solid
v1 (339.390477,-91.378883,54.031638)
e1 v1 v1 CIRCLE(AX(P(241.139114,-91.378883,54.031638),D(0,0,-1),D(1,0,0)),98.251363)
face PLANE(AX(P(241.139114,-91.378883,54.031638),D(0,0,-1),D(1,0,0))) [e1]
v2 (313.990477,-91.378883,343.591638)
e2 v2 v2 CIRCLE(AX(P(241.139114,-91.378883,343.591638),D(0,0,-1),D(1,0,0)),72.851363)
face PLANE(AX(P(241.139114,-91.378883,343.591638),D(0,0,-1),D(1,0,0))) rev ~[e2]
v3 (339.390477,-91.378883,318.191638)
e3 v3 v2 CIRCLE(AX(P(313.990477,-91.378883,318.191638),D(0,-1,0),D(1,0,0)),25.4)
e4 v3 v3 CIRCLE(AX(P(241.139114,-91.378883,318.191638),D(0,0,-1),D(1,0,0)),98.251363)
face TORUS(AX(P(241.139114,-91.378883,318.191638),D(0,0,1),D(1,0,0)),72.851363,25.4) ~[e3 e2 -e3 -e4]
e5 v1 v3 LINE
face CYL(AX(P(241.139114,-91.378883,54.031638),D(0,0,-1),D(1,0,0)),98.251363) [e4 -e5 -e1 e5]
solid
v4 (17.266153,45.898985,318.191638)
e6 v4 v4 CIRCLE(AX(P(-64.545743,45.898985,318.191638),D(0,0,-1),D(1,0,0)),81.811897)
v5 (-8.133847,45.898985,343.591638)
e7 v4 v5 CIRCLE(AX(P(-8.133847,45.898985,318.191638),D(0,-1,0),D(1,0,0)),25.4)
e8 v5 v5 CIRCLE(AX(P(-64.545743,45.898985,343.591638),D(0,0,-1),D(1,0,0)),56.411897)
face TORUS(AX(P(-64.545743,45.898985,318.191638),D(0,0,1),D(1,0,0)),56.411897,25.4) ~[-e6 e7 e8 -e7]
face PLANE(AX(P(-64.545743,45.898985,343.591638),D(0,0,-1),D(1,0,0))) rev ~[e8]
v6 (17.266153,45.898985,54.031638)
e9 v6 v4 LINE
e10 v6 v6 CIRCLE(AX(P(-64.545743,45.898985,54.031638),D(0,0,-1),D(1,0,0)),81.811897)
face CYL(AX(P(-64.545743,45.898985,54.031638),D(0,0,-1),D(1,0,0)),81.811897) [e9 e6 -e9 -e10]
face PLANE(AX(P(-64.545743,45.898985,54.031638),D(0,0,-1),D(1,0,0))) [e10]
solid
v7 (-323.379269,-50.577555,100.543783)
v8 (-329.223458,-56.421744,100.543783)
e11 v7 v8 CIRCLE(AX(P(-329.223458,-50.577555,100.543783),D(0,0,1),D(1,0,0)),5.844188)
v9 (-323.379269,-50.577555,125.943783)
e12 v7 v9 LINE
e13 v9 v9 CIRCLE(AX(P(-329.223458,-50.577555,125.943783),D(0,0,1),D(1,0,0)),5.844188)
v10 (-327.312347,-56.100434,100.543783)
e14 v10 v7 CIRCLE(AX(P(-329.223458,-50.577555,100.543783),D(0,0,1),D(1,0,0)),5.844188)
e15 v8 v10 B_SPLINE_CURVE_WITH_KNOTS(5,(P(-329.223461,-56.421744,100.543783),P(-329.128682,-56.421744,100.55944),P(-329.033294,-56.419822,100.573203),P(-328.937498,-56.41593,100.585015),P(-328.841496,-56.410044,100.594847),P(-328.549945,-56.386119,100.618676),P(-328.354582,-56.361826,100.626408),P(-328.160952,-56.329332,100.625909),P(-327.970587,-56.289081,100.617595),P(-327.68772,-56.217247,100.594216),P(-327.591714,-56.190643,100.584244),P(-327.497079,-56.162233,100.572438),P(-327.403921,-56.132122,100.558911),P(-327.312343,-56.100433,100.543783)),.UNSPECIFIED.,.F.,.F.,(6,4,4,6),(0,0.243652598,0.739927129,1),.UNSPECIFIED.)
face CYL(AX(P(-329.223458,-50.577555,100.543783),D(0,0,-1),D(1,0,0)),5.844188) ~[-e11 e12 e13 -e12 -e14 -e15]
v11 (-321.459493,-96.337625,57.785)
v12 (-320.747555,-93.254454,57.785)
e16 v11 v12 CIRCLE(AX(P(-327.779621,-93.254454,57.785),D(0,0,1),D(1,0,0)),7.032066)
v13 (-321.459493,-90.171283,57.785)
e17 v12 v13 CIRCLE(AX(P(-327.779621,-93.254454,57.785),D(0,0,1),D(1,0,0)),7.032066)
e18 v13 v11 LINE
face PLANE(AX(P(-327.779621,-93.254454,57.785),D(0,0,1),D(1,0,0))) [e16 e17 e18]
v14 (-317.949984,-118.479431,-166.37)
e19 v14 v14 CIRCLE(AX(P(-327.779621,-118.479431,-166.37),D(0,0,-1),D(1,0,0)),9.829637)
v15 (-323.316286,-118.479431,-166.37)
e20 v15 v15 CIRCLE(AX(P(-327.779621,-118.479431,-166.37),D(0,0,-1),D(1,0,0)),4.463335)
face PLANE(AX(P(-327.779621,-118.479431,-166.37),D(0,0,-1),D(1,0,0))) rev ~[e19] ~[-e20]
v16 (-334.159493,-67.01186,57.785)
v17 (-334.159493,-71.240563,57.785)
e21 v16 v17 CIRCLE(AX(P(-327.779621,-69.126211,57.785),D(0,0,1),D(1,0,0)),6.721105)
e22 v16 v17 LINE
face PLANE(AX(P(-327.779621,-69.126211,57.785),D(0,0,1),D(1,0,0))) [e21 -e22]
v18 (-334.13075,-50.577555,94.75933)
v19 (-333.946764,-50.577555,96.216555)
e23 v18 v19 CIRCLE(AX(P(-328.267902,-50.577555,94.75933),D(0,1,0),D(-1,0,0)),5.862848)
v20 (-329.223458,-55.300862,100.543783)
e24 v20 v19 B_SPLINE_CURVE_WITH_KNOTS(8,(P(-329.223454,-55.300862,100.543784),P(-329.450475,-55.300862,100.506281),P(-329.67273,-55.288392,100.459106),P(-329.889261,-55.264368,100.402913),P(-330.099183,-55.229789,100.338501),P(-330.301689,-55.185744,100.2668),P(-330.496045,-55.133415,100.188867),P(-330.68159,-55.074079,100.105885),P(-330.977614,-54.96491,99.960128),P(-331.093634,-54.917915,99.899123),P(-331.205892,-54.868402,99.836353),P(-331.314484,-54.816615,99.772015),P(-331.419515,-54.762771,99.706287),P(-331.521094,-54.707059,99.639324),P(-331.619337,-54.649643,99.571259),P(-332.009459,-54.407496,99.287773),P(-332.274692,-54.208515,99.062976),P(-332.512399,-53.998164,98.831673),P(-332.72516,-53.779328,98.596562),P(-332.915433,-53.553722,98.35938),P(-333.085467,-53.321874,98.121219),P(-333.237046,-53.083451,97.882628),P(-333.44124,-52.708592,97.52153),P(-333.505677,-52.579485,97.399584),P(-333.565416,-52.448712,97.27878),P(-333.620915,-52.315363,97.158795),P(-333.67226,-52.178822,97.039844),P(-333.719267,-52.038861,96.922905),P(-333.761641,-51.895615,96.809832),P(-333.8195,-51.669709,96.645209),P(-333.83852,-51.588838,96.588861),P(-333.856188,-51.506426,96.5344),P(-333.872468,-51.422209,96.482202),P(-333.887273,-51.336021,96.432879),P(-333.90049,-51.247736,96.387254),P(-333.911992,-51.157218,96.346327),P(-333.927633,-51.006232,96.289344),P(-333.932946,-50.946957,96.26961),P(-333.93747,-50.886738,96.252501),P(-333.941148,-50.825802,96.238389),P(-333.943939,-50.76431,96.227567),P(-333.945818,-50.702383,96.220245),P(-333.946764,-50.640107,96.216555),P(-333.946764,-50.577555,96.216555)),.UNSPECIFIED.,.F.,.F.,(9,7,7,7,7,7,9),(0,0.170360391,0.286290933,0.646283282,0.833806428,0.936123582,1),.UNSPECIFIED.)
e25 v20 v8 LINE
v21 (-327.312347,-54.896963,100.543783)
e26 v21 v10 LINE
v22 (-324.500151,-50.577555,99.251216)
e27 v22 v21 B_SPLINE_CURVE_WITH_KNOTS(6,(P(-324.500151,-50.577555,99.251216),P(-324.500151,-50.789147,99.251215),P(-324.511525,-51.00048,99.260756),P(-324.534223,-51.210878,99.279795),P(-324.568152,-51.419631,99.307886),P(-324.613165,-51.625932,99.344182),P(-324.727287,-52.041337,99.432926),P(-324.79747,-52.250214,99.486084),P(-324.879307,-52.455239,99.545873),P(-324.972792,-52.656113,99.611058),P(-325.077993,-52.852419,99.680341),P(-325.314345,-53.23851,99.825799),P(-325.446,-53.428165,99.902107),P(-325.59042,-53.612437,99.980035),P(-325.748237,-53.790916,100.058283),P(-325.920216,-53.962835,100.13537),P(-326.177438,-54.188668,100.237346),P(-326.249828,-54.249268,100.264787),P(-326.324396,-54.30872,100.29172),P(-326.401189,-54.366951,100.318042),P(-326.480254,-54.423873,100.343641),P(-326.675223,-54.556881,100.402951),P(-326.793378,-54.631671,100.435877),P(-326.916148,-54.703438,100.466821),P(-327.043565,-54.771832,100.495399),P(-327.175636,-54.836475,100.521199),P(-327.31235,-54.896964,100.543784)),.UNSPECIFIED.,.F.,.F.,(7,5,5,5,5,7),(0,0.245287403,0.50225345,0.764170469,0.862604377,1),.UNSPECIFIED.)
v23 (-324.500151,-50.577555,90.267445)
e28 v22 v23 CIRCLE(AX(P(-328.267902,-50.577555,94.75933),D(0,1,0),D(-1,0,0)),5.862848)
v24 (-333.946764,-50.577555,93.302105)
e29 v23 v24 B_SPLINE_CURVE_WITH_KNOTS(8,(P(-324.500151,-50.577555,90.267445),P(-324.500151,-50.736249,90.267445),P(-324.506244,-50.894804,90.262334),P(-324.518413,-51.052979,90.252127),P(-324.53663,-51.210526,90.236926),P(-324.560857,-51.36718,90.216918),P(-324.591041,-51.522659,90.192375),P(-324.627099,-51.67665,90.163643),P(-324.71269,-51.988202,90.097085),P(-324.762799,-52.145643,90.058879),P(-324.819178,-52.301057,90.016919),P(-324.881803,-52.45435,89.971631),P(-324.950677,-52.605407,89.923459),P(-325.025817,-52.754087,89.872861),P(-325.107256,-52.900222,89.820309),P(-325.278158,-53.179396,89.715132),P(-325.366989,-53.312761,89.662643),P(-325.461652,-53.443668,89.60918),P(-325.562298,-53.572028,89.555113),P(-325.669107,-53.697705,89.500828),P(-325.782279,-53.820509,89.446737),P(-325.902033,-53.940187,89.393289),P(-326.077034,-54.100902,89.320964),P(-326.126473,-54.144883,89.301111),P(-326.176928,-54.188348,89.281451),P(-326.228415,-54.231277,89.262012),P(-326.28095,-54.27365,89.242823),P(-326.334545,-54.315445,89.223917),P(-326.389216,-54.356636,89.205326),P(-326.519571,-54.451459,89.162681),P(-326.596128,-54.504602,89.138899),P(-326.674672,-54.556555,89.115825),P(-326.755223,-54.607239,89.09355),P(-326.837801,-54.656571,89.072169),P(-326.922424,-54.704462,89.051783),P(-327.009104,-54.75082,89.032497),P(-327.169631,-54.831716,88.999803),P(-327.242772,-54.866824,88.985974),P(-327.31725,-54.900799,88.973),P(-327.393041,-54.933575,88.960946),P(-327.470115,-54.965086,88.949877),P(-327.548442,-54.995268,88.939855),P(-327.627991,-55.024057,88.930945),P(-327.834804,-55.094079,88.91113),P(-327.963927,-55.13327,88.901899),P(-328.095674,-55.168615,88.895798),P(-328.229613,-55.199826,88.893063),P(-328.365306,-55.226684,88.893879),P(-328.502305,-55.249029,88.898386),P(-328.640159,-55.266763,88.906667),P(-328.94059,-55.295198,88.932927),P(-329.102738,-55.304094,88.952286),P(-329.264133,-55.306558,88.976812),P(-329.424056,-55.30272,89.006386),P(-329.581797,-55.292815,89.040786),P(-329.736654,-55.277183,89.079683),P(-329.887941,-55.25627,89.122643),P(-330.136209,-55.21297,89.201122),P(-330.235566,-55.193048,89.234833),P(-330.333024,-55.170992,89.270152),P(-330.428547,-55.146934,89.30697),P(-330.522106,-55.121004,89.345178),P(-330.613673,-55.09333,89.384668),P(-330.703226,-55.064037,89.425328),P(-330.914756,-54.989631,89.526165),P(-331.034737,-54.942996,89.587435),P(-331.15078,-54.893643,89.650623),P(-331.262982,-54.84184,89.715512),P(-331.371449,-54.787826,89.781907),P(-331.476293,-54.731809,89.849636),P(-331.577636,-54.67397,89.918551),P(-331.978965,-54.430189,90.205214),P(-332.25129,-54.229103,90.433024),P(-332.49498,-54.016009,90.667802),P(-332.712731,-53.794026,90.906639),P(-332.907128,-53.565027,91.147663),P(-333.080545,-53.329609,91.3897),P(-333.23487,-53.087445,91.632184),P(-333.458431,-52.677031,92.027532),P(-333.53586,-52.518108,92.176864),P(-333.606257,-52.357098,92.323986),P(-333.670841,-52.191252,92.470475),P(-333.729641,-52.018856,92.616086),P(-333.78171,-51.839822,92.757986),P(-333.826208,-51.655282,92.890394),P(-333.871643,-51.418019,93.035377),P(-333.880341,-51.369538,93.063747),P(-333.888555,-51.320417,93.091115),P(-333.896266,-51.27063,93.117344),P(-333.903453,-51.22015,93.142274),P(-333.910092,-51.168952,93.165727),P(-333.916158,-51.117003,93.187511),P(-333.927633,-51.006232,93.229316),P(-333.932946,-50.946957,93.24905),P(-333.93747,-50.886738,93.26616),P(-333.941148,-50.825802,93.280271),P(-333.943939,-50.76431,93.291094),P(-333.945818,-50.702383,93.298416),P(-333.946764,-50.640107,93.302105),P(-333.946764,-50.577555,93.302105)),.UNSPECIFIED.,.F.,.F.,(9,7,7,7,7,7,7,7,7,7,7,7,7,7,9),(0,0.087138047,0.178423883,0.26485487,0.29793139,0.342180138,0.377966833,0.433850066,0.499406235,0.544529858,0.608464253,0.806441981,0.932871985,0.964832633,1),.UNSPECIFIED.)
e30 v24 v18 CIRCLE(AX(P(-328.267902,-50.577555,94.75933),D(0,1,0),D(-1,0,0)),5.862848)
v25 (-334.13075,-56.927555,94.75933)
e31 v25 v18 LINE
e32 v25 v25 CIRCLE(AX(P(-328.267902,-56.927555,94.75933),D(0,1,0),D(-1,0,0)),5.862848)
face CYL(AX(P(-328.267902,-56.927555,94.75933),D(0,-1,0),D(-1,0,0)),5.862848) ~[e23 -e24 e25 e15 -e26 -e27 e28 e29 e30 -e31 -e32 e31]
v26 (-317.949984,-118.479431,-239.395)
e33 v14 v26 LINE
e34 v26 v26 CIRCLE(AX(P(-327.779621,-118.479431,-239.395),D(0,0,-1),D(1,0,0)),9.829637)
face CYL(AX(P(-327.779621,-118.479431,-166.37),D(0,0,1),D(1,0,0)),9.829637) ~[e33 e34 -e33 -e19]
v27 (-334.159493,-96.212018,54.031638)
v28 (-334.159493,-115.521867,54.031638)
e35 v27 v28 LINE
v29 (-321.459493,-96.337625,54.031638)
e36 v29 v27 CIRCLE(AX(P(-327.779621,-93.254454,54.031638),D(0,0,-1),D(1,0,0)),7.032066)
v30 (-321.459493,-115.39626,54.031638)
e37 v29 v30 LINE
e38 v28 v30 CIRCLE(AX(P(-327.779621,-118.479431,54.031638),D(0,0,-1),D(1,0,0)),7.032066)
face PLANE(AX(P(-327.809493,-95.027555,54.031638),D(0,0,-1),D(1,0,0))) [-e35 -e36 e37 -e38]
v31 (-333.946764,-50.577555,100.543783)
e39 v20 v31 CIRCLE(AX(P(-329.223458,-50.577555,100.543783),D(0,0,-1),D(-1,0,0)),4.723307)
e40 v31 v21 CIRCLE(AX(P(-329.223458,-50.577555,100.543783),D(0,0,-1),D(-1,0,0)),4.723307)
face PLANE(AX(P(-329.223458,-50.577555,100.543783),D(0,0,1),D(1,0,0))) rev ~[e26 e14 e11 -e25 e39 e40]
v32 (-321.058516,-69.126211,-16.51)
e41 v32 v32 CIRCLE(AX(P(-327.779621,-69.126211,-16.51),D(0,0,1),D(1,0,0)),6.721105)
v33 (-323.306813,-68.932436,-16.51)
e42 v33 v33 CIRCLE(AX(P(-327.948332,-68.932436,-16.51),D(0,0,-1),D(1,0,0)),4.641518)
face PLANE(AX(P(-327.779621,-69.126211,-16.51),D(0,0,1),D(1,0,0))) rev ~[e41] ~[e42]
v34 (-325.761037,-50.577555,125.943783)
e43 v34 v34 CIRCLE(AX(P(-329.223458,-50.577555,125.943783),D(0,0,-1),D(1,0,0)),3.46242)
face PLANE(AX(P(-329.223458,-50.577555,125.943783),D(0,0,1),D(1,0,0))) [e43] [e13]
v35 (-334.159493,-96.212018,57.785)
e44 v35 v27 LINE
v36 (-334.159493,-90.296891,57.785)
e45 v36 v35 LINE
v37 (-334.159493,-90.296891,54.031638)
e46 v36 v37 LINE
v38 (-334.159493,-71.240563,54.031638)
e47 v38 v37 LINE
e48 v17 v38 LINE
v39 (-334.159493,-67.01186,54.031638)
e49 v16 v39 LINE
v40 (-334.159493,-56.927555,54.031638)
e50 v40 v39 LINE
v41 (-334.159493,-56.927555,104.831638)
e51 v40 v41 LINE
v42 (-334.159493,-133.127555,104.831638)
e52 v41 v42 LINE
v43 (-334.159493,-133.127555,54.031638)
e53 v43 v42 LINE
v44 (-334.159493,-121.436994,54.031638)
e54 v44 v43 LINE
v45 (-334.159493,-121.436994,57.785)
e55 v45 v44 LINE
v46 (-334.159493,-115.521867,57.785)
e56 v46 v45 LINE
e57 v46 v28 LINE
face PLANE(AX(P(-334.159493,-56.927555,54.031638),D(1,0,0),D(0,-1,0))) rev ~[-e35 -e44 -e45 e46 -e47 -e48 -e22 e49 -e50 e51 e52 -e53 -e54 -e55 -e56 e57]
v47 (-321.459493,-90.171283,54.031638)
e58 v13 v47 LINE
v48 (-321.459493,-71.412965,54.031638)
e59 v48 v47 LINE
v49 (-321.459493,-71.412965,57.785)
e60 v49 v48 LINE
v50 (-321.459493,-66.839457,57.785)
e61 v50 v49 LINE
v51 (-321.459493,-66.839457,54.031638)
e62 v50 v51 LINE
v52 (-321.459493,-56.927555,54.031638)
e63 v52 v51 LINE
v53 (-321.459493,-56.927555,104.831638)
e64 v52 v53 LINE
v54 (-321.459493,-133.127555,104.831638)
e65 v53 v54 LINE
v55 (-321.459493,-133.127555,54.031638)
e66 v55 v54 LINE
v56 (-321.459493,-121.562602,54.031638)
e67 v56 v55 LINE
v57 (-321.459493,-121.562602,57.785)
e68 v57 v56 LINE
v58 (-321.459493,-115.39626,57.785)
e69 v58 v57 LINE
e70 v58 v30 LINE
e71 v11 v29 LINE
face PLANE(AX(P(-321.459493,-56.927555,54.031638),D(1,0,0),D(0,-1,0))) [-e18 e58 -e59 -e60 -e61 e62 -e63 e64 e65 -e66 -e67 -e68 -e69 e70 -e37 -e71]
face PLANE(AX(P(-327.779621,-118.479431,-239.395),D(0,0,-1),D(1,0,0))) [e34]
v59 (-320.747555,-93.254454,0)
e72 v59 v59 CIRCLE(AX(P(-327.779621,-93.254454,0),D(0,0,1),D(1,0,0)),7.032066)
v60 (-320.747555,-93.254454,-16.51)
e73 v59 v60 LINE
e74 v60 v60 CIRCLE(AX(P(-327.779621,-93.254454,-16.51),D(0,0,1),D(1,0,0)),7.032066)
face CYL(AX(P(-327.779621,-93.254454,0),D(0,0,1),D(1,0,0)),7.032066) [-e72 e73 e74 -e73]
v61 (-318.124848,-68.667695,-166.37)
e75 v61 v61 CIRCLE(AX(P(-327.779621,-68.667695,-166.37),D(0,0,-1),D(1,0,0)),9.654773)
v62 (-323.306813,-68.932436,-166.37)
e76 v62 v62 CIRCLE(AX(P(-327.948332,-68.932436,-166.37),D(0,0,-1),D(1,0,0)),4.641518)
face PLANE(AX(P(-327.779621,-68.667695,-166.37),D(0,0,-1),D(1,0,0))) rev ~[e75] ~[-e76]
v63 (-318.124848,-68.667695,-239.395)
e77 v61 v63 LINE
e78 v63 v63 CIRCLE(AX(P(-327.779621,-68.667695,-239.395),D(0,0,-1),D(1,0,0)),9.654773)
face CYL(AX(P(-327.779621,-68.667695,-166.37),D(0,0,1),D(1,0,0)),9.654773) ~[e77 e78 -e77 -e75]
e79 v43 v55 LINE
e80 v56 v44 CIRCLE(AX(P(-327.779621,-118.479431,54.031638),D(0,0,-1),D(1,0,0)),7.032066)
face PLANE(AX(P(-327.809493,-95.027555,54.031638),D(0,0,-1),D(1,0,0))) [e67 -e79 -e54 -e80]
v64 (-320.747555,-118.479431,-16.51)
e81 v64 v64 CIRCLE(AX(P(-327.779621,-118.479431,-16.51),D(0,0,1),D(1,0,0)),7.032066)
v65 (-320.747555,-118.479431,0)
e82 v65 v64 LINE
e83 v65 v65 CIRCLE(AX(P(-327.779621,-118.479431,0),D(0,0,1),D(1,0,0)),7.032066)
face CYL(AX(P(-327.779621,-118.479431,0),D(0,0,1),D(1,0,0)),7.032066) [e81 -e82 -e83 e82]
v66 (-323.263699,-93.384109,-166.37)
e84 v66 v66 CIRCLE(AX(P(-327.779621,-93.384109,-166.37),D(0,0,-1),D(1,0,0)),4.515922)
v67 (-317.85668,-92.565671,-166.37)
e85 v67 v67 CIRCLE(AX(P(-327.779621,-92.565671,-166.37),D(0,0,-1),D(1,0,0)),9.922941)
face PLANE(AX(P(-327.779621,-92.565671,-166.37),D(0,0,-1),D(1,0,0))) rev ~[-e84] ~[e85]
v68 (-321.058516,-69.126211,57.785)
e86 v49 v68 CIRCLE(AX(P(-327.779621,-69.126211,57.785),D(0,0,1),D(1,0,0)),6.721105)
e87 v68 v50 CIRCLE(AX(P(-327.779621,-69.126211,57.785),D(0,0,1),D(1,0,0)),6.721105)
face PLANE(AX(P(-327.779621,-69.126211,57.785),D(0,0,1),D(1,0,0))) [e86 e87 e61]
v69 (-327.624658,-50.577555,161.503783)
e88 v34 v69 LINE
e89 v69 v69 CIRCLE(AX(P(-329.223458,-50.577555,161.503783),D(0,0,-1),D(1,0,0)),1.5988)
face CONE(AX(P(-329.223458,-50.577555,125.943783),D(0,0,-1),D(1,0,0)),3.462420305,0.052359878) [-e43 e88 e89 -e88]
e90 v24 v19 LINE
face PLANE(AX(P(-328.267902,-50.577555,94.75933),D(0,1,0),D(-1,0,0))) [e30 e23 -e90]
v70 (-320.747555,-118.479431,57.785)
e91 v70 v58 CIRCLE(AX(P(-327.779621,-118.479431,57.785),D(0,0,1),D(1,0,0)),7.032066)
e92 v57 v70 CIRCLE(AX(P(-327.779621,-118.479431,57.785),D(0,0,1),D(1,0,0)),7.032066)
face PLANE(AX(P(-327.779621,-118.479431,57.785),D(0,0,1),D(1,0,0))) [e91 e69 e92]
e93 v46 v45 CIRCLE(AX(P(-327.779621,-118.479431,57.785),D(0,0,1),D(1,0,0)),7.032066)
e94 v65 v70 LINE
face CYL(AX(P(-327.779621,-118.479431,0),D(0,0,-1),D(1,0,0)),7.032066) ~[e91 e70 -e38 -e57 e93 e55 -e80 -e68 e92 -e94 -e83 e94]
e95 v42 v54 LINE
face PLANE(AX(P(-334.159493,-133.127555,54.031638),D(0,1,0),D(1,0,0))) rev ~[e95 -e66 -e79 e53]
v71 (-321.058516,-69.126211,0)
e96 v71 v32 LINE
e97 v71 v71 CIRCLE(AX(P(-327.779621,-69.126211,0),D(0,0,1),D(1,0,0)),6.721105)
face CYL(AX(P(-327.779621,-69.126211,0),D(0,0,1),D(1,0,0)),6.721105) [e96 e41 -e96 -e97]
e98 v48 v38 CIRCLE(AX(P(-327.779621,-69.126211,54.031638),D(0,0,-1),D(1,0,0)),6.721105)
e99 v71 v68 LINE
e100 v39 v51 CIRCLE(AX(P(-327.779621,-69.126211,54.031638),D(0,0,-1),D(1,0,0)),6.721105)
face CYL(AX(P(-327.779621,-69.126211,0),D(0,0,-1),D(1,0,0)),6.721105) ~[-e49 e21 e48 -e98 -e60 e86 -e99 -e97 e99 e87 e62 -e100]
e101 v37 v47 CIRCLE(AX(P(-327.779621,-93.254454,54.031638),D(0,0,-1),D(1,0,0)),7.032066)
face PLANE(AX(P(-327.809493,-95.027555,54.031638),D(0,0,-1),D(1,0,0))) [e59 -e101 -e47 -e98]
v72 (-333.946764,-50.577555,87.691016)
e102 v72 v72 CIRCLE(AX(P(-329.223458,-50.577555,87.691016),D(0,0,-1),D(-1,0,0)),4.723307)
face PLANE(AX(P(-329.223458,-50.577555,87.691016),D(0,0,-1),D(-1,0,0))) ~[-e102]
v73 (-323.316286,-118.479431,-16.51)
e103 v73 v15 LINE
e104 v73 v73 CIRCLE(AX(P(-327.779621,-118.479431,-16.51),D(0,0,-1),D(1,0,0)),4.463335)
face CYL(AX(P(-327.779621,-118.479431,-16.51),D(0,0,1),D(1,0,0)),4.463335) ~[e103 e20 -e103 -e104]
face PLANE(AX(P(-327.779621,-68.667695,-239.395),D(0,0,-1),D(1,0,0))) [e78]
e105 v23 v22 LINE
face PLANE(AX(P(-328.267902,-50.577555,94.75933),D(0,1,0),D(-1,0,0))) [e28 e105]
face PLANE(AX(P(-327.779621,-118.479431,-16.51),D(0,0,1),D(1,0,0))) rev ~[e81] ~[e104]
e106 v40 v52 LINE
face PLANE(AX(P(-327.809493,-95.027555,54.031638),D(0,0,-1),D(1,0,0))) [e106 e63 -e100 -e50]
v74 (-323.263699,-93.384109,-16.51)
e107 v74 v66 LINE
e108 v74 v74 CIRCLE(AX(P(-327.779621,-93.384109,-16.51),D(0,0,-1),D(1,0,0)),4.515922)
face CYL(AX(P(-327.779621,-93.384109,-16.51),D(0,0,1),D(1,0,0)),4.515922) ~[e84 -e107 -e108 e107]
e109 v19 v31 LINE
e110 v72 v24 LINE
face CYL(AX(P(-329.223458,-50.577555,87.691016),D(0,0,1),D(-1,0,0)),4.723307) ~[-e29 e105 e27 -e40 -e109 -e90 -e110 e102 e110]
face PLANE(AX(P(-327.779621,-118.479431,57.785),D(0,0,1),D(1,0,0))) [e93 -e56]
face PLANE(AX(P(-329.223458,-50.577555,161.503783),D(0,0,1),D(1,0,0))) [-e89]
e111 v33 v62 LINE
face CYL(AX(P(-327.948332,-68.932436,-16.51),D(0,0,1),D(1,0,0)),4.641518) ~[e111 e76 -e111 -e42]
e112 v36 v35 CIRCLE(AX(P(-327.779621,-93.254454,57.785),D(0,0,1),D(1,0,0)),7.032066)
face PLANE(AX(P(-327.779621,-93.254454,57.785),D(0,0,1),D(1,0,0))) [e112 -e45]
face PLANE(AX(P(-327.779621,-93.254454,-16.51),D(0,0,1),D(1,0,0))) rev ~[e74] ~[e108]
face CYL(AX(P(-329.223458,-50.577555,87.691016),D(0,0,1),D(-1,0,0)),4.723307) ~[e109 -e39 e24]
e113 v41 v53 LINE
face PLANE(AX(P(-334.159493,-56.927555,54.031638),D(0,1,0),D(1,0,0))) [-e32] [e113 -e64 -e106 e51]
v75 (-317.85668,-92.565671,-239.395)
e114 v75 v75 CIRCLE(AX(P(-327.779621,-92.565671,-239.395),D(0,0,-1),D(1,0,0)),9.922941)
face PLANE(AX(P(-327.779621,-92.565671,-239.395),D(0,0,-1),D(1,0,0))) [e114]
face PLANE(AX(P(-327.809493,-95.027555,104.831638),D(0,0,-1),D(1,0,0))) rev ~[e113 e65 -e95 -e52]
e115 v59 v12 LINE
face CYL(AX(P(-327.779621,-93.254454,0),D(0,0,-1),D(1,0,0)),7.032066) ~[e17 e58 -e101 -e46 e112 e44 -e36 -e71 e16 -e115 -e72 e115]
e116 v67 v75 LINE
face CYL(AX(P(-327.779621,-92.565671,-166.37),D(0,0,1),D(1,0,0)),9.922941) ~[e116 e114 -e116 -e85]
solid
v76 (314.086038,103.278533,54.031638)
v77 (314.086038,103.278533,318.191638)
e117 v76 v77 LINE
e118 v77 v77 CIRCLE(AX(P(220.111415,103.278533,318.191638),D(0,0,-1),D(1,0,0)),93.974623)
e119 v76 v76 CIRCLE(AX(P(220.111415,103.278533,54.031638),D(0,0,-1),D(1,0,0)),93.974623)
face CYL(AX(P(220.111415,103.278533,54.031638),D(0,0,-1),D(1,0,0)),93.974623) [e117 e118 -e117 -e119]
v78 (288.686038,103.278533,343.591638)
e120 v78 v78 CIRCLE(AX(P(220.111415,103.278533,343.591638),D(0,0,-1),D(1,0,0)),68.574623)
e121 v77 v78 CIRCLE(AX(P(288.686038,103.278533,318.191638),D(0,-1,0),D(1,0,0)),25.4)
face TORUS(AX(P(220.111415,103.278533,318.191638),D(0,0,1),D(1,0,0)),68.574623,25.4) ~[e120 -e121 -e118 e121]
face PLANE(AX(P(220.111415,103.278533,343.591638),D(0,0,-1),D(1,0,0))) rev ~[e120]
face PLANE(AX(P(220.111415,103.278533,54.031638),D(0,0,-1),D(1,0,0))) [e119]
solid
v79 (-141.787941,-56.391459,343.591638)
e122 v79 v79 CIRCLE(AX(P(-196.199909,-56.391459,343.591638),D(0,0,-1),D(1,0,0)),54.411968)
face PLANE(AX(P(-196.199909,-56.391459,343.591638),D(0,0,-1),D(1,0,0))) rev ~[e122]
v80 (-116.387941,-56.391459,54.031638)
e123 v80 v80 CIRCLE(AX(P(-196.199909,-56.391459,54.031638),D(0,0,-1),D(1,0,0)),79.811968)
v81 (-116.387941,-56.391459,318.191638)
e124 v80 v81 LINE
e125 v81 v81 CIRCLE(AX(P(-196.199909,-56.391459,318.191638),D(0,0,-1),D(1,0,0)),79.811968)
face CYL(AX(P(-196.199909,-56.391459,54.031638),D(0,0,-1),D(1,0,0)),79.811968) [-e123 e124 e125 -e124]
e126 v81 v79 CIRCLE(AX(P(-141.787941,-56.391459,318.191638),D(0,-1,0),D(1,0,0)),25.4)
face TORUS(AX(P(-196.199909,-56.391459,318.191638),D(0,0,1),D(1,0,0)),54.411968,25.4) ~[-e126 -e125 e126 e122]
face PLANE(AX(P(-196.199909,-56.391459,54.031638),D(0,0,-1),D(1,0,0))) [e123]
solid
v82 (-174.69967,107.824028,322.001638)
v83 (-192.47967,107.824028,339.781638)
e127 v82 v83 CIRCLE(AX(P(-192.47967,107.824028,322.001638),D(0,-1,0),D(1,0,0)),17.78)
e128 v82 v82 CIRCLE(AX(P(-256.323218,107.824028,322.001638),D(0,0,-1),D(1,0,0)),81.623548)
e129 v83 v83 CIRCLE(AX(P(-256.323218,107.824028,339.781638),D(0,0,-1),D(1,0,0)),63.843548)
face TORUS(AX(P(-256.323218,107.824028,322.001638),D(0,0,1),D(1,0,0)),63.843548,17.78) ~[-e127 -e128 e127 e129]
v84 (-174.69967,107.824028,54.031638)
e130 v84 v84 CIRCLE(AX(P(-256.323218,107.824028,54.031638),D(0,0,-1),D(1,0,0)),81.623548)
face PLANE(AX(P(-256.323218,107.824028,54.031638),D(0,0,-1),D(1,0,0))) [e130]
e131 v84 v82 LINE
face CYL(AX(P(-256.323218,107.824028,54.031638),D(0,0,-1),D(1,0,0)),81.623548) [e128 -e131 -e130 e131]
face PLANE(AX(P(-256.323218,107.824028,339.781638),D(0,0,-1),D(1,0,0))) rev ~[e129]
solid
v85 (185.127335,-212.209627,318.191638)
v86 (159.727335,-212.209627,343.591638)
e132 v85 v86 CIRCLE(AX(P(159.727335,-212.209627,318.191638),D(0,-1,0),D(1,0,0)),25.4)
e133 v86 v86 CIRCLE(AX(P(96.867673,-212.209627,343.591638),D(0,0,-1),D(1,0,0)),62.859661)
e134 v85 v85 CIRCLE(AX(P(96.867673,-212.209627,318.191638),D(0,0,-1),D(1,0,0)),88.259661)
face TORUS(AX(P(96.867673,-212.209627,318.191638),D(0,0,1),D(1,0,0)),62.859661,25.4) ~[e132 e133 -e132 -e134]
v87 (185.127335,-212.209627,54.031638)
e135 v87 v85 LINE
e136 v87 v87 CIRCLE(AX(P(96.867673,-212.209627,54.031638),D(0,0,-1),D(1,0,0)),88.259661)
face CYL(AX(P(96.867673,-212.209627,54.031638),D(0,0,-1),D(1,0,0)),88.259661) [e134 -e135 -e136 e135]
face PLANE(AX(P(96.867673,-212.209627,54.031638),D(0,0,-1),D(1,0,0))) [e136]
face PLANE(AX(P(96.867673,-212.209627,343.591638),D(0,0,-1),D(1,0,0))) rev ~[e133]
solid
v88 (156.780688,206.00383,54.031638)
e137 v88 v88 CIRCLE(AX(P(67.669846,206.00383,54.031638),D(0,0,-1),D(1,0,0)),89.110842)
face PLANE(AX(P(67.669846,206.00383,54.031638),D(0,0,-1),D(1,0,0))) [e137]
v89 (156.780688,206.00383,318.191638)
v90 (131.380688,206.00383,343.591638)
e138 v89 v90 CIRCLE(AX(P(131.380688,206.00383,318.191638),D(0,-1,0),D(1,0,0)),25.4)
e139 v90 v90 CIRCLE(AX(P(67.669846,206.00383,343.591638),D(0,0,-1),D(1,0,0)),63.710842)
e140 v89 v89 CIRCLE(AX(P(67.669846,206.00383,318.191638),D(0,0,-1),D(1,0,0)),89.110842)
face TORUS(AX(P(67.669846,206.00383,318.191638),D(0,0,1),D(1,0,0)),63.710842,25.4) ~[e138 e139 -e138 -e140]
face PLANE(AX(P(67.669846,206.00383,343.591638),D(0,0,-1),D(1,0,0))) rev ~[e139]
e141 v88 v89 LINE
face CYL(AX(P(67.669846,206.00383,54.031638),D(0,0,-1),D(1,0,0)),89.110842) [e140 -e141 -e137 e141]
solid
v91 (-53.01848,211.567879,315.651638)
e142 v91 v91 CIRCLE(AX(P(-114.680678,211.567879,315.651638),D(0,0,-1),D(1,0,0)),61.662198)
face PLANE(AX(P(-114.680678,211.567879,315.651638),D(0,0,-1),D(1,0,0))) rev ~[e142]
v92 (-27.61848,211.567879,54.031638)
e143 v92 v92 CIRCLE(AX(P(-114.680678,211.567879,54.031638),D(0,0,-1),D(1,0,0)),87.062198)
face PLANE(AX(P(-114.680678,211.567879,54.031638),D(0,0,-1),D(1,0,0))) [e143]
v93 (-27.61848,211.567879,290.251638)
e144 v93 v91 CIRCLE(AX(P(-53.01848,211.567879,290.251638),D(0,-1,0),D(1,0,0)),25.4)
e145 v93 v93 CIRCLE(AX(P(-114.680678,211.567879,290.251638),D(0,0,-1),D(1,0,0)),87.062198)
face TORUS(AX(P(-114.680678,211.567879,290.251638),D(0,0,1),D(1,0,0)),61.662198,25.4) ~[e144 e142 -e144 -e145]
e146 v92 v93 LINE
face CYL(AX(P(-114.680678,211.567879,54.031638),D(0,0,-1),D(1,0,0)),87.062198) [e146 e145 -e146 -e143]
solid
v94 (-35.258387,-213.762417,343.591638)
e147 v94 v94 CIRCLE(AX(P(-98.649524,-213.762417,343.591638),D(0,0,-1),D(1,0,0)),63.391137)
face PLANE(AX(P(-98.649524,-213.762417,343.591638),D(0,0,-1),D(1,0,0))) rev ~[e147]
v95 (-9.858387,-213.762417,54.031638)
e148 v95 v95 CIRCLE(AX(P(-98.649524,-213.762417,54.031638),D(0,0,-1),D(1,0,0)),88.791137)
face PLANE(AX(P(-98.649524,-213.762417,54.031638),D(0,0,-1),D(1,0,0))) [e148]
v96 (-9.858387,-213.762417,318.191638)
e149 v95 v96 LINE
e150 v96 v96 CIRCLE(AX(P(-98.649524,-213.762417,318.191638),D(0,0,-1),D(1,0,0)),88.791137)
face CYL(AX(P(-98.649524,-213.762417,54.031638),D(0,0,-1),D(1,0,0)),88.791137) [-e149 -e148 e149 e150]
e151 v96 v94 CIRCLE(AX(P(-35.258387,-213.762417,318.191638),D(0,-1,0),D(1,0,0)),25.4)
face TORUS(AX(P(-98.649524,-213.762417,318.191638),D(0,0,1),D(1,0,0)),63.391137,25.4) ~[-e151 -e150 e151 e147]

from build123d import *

# Parameters (mm, degrees)
F2_W           = 12.7
F2_H           = 76.2
F3_DEPTH       = 50.8
F4_R           = 5.8628476557
F5_DEPTH       = 6.35
F8_R           = 5.8441884283
F9_DEPTH       = 25.4
F10_R          = 3.4624203049
F11_DEPTH      = 35.56
F11_TAPER      = 3
F12_R          = 7.0320661699
F12_R_2        = 6.7211052485
F13_DEPTH      = 57.785
F13_DEPTH_BACK = 16.51
F14_R          = 4.4633349548
F14_R_2        = 4.5159221891
F14_R_3        = 4.641518377
F15_DEPTH      = 149.86
F16_R          = 9.8296366939
F16_R_2        = 9.9229407279
F16_R_3        = 9.6547726801
F17_DEPTH      = 73.025
F18_R          = 81.6235481259
F19_DEPTH      = 285.75
F20_R          = 17.78
F21_R          = 87.0621975567
F22_DEPTH      = 261.62
F23_R          = 89.1108416069
F24_DEPTH      = 289.56
F23_R_2        = 93.9746231805
F23_R_3        = 98.2513633913
F23_R_4        = 88.2596614963
F23_R_5        = 88.7911367864
F23_R_6        = 81.8118965518
F23_R_7        = 79.8119680434
F25_R          = 25.4
F25_2_R        = 25.4
F25_3_R        = 25.4
F25_4_R        = 25.4
F25_5_R        = 25.4
F25_6_R        = 25.4
F25_7_R        = 25.4
F25_8_R        = 25.4


# Not quite as in the source:
# - the program builds the solid bodies; features that only make, move or delete a surface that nothing else refers to are left out


with BuildPart() as f3:
    # F2 (on face) → F3 (new body)
    with BuildSketch(Plane(origin=(0, 0, 54.0316375996), x_dir=(1, 0, 0), z_dir=(0, 0, -1))):
        with Locations((-327.8094934464, 95.0275551417)):
            Rectangle(F2_W, F2_H)
    extrude(amount=-F3_DEPTH)

    # F4 (on face) → F5 (join)
    with BuildSketch(Plane(origin=(0, -56.9275551417, 0), x_dir=(-1, 0, 0), z_dir=(0, 1, 0))):
        with Locations((328.2679021358, 94.7593301535)):
            Circle(F4_R)
    extrude(amount=F5_DEPTH)

    # F6 (on face) → F7 (revolve)
    with BuildSketch(Plane(origin=(0, -50.5775551417, 0), x_dir=(-1, 0, 0), z_dir=(0, 1, 0))):
        with BuildLine():
            Line((333.9467644691, 100.5437831202), (329.2234577381, 100.5437831202))
            ThreePointArc((329.2234577381, 100.5437831202), (332.2283440821, 99.0822784788), (333.9467644691, 96.2165553361))
            Line((333.9467644691, 96.2165553361), (333.9467644691, 100.5437831202))
        make_face()
        with BuildLine():
            ThreePointArc((333.9467644691, 93.3021049708), (332.2283440821, 90.4363818281), (329.2234577381, 88.9748771867))
            Line((329.2234577381, 88.9748771867), (329.2234577381, 87.6910164952))
            Line((329.2234577381, 87.6910164952), (333.9467644691, 87.6910164952))
            Line((333.9467644691, 87.6910164952), (333.9467644691, 93.3021049708))
        make_face()
        with BuildLine():
            ThreePointArc((333.9467644691, 96.2165553361), (332.2283440821, 99.0822784788), (329.2234577381, 100.5437831202))
            Line((329.2234577381, 100.5437831202), (329.2234577381, 88.9748771867))
            ThreePointArc((329.2234577381, 88.9748771867), (332.2283440821, 90.4363818281), (333.9467644691, 93.3021049708))
            Line((333.9467644691, 93.3021049708), (333.9467644691, 96.2165553361))
        make_face()
    revolve(axis=Axis((-329.2234577381, -50.5775551417, 94.1173998077), (0, 0, -1)))

    # F8 (on face) → F9 (join)
    with BuildSketch(Plane.XY.offset(100.5437831202)):
        with Locations((-329.2234577381, -50.5775551417)):
            Circle(F8_R)
    extrude(amount=F9_DEPTH)

    # F10 (on face) → F11 (join)
    with BuildSketch(Plane.XY.offset(125.9437831202)):
        with Locations((-329.2234577381, -50.5775551417)):
            Circle(F10_R)
    extrude(amount=F11_DEPTH, taper=F11_TAPER)

    # F12 (on face) → F13 (join, two sides)
    with BuildSketch(Plane.XY) as f13_sk:
        with Locations((-327.7796208858, -118.4794306755)):
            Circle(F12_R)
        with Locations((-327.7796208858, -93.2544544339)):
            Circle(F12_R)
        with Locations((-327.7796208858, -69.1262111068)):
            Circle(F12_R_2)
    extrude(amount=F13_DEPTH)
    extrude(f13_sk.sketch, amount=-F13_DEPTH_BACK)

    # F14 (on face) → F15 (join)
    with BuildSketch(Plane(origin=(0, 0, -16.51), x_dir=(1, 0, 0), z_dir=(0, 0, -1))):
        with Locations((-327.7796208858, 118.4794306755)):
            Circle(F14_R)
        with Locations((-327.7796208858, 93.3841094375)):
            Circle(F14_R_2)
        with Locations((-327.9483318329, 68.9324364066)):
            Circle(F14_R_3)
    extrude(amount=F15_DEPTH)

    # F16 (on face) → F17 (join)
    with BuildSketch(Plane(origin=(0, 0, -166.37), x_dir=(1, 0, 0), z_dir=(0, 0, -1))):
        with Locations((-327.7796208858, 118.4794306755)):
            Circle(F16_R)
        with Locations((-327.7796208858, 92.5656706095)):
            Circle(F16_R_2)
        with Locations((-327.7796208858, 68.6676949263)):
            Circle(F16_R_3)
    extrude(amount=F17_DEPTH)


with BuildPart() as f19:
    # F18 (on face) → F19 (new body)
    with BuildSketch(Plane(origin=(0, 0, 54.0316375996), x_dir=(1, 0, 0), z_dir=(0, 0, -1))):
        with Locations((-256.3232183456, -107.8240275383)):
            Circle(F18_R)
    extrude(amount=-F19_DEPTH)

    # F20
    f20_edges = [f19.edges().sort_by_distance(p)[0] for p in [
        (-337.946766, 107.824028, 339.781638),
    ]]
    fillet(f20_edges, radius=F20_R)


with BuildPart() as f22:
    # F21 (on face) → F22 (new body)
    with BuildSketch(Plane(origin=(0, 0, 54.0316375996), x_dir=(1, 0, 0), z_dir=(0, 0, -1))):
        with Locations((-114.6806776524, -211.5678787231)):
            Circle(F21_R)
    extrude(amount=-F22_DEPTH)

    # F25
    f25_edges = [f22.edges().sort_by_distance(p)[0] for p in [
        (-201.742875, 211.567879, 315.651638),
    ]]
    fillet(f25_edges, radius=F25_R)


with BuildPart() as f24:
    # F23 (on face) → F24 (new body)
    with BuildSketch(Plane(origin=(0, 0, 54.0316375996), x_dir=(1, 0, 0), z_dir=(0, 0, -1))):
        with Locations((67.6698461175, -206.0038298368)):
            Circle(F23_R)
    extrude(amount=-F24_DEPTH)

    # F25#2
    f25_2_edges = [f24.edges().sort_by_distance(p)[0] for p in [
        (-21.440995, 206.00383, 343.591638),
    ]]
    fillet(f25_2_edges, radius=F25_2_R)


with BuildPart() as f24b:
    # F23 (on face) → F24, piece 2 (new body)
    with BuildSketch(Plane(origin=(0, 0, 54.0316375996), x_dir=(1, 0, 0), z_dir=(0, 0, -1))):
        with Locations((220.1114147902, -103.2785326242)):
            Circle(F23_R_2)
    extrude(amount=-F24_DEPTH)

    # F25#3
    f25_3_edges = [f24b.edges().sort_by_distance(p)[0] for p in [
        (126.136792, 103.278533, 343.591638),
    ]]
    fillet(f25_3_edges, radius=F25_3_R)


with BuildPart() as f24c:
    # F23 (on face) → F24, piece 3 (new body)
    with BuildSketch(Plane(origin=(0, 0, 54.0316375996), x_dir=(1, 0, 0), z_dir=(0, 0, -1))):
        with Locations((241.139113903, 91.3788825274)):
            Circle(F23_R_3)
    extrude(amount=-F24_DEPTH)

    # F25#4
    f25_4_edges = [f24c.edges().sort_by_distance(p)[0] for p in [
        (142.887751, -91.378883, 343.591638),
    ]]
    fillet(f25_4_edges, radius=F25_4_R)


with BuildPart() as f24d:
    # F23 (on face) → F24, piece 4 (new body)
    with BuildSketch(Plane(origin=(0, 0, 54.0316375996), x_dir=(1, 0, 0), z_dir=(0, 0, -1))):
        with Locations((96.867673099, 212.2096270323)):
            Circle(F23_R_4)
    extrude(amount=-F24_DEPTH)

    # F25#5
    f25_5_edges = [f24d.edges().sort_by_distance(p)[0] for p in [
        (8.608012, -212.209627, 343.591638),
    ]]
    fillet(f25_5_edges, radius=F25_5_R)


with BuildPart() as f24e:
    # F23 (on face) → F24, piece 5 (new body)
    with BuildSketch(Plane(origin=(0, 0, 54.0316375996), x_dir=(1, 0, 0), z_dir=(0, 0, -1))):
        with Locations((-98.6495241523, 213.7624174356)):
            Circle(F23_R_5)
    extrude(amount=-F24_DEPTH)

    # F25#6
    f25_6_edges = [f24e.edges().sort_by_distance(p)[0] for p in [
        (-187.440661, -213.762417, 343.591638),
    ]]
    fillet(f25_6_edges, radius=F25_6_R)


with BuildPart() as f24f:
    # F23 (on face) → F24, piece 6 (new body)
    with BuildSketch(Plane(origin=(0, 0, 54.0316375996), x_dir=(1, 0, 0), z_dir=(0, 0, -1))):
        with Locations((-64.5457431674, -45.8989851177)):
            Circle(F23_R_6)
    extrude(amount=-F24_DEPTH)

    # F25#7
    f25_7_edges = [f24f.edges().sort_by_distance(p)[0] for p in [
        (-146.35764, 45.898985, 343.591638),
    ]]
    fillet(f25_7_edges, radius=F25_7_R)


with BuildPart() as f24g:
    # F23 (on face) → F24, piece 7 (new body)
    with BuildSketch(Plane(origin=(0, 0, 54.0316375996), x_dir=(1, 0, 0), z_dir=(0, 0, -1))):
        with Locations((-196.1999088526, 56.3914589584)):
            Circle(F23_R_7)
    extrude(amount=-F24_DEPTH)

    # F25#8
    f25_8_edges = [f24g.edges().sort_by_distance(p)[0] for p in [
        (-276.011877, -56.391459, 343.591638),
    ]]
    fillet(f25_8_edges, radius=F25_8_R)


solid = Compound([f3.part, f19.part, f22.part, f24.part, f24b.part, f24c.part, f24d.part, f24e.part, f24f.part, f24g.part])
